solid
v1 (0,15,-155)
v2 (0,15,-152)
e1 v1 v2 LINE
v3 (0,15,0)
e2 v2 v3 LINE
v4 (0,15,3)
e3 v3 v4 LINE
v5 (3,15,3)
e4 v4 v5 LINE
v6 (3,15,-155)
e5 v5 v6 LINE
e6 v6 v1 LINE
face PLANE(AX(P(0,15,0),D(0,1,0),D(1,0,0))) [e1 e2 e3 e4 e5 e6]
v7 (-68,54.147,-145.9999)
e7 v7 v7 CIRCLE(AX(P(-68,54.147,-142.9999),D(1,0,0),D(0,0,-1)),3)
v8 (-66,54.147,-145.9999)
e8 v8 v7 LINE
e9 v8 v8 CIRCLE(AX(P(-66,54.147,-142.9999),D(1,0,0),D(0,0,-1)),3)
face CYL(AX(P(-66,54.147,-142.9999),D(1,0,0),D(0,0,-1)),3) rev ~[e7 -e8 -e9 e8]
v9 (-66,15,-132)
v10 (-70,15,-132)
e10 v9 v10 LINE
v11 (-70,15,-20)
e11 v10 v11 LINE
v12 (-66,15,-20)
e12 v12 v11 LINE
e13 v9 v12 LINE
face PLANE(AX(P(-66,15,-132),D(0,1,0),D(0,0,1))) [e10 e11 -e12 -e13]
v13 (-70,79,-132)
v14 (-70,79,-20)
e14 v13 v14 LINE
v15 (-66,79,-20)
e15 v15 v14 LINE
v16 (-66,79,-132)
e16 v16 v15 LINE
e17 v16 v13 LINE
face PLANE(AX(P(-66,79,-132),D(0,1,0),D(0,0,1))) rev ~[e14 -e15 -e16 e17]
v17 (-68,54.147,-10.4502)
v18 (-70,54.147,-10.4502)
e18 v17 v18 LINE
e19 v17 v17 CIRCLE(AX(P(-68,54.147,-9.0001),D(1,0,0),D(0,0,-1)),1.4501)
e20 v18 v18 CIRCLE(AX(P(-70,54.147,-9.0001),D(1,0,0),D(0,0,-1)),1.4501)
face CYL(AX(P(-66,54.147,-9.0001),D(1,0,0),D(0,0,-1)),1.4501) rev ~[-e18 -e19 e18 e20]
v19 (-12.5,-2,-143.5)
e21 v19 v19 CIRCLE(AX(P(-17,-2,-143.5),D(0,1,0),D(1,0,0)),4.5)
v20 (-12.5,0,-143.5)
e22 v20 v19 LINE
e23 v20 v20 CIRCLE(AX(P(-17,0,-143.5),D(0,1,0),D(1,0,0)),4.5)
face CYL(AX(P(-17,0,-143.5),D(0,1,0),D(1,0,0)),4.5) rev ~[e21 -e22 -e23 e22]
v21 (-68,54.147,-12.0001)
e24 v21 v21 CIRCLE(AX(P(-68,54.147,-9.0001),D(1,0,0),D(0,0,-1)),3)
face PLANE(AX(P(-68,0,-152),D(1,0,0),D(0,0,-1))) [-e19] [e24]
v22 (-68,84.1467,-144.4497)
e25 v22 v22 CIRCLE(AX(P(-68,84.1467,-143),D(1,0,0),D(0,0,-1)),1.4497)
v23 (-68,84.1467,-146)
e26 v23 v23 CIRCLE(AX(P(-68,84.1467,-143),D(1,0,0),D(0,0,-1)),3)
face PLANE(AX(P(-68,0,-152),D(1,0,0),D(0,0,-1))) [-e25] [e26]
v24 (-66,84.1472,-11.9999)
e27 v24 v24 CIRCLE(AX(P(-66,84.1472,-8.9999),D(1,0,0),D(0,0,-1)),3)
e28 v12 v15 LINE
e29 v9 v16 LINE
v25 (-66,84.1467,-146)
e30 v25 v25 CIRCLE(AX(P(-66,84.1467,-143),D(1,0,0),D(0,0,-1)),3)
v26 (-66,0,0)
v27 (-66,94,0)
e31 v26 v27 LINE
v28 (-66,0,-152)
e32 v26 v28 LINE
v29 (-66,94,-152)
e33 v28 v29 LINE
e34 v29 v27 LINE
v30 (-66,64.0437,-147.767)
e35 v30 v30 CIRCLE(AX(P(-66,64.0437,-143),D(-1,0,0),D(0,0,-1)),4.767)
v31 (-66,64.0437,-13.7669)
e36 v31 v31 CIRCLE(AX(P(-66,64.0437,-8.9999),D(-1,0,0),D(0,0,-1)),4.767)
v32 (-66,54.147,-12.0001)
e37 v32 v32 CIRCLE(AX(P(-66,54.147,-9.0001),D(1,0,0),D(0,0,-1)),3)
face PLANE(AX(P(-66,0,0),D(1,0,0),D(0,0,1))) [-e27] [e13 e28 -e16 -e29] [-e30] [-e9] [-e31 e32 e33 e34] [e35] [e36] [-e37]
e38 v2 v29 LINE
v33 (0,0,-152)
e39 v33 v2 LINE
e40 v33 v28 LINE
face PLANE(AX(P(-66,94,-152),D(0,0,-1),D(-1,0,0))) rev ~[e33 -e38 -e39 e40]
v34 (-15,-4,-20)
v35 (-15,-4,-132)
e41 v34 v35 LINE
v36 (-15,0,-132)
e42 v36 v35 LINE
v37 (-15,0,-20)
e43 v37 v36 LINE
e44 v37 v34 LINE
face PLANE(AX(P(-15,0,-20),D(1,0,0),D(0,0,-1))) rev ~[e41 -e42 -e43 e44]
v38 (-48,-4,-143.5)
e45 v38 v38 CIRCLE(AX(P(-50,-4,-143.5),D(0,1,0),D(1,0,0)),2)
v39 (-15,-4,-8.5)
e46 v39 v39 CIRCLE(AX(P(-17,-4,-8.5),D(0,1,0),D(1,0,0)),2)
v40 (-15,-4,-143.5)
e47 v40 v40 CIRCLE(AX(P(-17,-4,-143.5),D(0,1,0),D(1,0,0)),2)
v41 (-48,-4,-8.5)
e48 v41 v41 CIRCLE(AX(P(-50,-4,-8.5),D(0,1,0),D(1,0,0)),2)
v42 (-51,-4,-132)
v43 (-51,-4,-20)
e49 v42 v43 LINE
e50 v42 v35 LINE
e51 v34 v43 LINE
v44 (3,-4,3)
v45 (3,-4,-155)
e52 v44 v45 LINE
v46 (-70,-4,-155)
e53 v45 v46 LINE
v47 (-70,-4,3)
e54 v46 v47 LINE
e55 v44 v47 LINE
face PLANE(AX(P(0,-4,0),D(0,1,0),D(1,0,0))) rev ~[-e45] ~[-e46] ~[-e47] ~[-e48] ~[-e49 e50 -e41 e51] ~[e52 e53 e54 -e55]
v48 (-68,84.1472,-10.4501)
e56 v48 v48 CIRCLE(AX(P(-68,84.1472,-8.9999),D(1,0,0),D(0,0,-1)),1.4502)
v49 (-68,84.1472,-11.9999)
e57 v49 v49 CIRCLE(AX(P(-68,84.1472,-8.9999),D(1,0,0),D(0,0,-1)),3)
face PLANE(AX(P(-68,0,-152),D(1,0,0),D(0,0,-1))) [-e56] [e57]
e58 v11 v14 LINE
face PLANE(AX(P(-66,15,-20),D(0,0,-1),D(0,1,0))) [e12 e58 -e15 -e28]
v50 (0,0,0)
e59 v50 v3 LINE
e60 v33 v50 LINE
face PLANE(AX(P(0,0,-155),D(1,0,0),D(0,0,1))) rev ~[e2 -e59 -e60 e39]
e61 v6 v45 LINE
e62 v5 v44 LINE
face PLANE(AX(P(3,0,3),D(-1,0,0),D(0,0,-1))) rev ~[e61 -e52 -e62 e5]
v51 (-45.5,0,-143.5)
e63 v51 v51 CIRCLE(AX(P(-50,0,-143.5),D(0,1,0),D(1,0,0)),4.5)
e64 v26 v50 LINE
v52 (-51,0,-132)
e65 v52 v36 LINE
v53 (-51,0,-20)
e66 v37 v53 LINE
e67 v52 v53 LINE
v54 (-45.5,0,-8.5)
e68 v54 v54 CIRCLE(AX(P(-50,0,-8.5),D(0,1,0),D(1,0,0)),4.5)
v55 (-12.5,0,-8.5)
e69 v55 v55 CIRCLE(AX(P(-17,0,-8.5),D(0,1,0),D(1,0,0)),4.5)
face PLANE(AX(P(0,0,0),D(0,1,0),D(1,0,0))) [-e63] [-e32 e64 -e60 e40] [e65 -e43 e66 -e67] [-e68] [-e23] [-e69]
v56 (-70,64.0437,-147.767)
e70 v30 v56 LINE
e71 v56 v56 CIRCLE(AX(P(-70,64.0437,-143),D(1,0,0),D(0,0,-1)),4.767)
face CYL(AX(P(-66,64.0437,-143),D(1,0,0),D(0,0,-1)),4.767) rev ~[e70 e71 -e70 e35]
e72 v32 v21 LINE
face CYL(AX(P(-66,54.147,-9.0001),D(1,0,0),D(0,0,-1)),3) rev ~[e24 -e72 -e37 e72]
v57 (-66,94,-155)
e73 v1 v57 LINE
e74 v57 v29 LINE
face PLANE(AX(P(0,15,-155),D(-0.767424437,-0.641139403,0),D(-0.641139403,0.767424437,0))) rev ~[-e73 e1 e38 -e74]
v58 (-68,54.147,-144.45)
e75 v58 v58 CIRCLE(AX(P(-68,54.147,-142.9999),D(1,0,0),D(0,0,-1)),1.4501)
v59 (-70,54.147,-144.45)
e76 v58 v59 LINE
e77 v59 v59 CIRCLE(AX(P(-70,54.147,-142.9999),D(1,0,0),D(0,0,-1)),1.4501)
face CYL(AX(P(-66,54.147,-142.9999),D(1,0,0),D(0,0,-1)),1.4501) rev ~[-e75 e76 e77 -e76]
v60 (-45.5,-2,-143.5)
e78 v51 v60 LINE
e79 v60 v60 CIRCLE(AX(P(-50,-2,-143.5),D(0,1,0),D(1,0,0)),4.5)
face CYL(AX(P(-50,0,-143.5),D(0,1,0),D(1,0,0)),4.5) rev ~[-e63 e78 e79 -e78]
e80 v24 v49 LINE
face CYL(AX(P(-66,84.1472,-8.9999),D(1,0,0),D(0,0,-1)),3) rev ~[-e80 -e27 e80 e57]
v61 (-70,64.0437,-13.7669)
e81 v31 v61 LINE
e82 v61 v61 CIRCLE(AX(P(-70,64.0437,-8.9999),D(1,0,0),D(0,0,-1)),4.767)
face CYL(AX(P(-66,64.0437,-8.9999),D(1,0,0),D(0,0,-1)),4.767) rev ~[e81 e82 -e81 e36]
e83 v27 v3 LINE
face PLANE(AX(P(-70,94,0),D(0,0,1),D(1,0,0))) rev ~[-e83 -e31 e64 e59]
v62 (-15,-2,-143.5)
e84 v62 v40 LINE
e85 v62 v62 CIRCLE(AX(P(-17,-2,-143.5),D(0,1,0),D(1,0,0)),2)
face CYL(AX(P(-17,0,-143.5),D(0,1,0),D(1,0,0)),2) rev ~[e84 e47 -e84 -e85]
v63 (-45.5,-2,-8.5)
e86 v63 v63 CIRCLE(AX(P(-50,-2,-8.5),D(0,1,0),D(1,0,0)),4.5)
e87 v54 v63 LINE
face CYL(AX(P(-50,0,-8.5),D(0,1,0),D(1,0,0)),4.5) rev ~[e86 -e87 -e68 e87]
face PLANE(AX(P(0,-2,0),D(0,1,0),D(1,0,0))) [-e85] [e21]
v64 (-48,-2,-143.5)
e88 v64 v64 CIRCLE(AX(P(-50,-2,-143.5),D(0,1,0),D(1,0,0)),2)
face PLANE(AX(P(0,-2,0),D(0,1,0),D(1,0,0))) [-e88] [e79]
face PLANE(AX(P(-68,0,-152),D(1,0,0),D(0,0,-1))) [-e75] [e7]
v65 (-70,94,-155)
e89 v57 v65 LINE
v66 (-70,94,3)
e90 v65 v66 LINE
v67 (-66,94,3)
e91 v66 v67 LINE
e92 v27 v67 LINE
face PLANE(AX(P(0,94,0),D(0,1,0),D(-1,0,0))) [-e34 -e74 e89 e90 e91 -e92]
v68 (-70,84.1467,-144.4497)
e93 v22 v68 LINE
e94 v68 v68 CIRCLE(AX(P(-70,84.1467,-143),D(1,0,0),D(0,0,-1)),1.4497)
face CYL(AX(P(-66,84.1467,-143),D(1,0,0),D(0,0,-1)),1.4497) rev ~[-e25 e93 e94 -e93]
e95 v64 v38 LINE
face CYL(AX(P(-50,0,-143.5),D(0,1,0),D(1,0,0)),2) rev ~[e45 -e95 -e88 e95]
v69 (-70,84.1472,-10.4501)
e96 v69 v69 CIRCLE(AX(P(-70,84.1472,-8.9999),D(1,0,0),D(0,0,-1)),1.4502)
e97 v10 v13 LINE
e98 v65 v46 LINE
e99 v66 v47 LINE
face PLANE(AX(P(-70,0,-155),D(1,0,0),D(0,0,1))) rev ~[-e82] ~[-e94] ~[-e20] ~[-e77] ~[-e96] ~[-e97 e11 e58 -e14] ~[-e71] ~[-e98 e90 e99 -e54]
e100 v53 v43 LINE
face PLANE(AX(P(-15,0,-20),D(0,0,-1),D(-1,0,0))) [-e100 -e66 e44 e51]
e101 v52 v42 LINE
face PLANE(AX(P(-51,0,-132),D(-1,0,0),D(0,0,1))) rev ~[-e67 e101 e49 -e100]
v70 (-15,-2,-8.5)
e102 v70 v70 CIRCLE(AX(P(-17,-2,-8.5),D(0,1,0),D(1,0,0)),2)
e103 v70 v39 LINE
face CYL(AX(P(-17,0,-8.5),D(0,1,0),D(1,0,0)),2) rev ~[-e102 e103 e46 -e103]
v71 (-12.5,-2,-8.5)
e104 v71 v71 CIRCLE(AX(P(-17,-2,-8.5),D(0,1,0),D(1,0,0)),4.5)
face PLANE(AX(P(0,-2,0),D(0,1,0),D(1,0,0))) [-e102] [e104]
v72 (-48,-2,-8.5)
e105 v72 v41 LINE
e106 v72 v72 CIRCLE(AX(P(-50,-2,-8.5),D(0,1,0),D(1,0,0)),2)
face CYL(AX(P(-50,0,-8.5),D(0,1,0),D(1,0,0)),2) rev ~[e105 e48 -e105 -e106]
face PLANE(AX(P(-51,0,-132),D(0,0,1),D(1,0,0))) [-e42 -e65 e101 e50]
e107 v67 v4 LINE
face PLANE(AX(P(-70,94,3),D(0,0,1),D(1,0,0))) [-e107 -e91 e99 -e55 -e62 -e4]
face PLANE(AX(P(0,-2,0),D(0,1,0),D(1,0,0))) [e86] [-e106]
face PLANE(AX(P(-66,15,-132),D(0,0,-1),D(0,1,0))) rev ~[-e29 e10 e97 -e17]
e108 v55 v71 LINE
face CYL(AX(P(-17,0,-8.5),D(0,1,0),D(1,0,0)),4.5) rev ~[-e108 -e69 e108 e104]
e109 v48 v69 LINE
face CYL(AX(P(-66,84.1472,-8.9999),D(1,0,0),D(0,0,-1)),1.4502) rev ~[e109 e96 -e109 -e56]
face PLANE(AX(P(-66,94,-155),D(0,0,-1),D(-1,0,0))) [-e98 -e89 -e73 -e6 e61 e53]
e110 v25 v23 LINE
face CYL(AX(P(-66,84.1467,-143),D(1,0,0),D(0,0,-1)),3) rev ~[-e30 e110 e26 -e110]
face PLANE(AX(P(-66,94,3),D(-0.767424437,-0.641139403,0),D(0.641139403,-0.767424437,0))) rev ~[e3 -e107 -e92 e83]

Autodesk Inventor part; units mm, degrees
ref_plane "YZ Plane" through (0, 0, 0) normal (1, 0, 0) x (0, 1, 0)
ref_plane "XZ Plane" through (0, 0, 0) normal (0, 1, 0) x (-1, 0, 0)
ref_plane "XY Plane" through (0, 0, 0) normal (0, 0, 1) x (1, 0, 0)
sketch "Sketch1" plane through (0, 0, 0) normal (0, 1, 0) x (-1, 0, 0)
  line L0 (0, 0) -> (0, -152)
  line L1 (0, -152) -> (66, -152)
  line L2 (66, -152) -> (66, 0)
  line L3 (66, 0) -> (0, 0)
  line L4 (66, 0) -> (66, 3)
  line L5 (66, 3) -> (0, 3)
  line L6 (0, 3) -> (0, 0)
  line L7 (66, -152) -> (66, -155)
  line L8 (66, -155) -> (0, -155)
  line L9 (0, -155) -> (0, -152)
  line L10 (66, -155) -> (70, -155)
  line L11 (70, -155) -> (70, 3)
  line L12 (70, 3) -> (66, 3)
  dimension "d0" = 152
  dimension "d1" = 66
  dimension "d2" = 3
  dimension "d3" = 3
  dimension "d4" = 4
extrude "Extrusion1" add sketch "Sketch1" against normal blind 4
extrude "Extrusion2" add sketch "Sketch1" along normal blind 94 contours L4 L12 L11 L10 L7 L2
sketch "Sketch7" plane through (0, 0, 0) normal (0, 1, 0) x (1, 0, 0)
  line L0 (0, 155) -> (0, -3) projected
  line L1 (0, -3) -> (3, -3)
  line L2 (3, -3) -> (3, 155)
  line L3 (3, 155) -> (0, 155)
  line L4 (0, 155) -> (0, -3)
  point P0 (0, 0)
  dimension "d15" = 3
extrude "Extrusion3" add sketch "Sketch7" against normal up to surface (4 mm away)
extrude "Extrusion4" add sketch "Sketch7" along normal blind 15
sketch "Sketch8" plane through (-66, 94, -155) normal (0, 0, -1) x (-1, 0, 0)
  line L0 (-66, -79) -> (0, 0)
  line L1 (0, -94) -> (0, 0) projected
  line L2 (0, 0) -> (0, -94)
  line L3 (-66, -94) -> (0, -94) projected
  line L4 (0, -94) -> (-66, -94)
  line L5 (-66, -94) -> (-66, -79)
extrude "Extrusion5" add sketch "Sketch8" against normal blind 3
sketch "Sketch9" plane through (-70, 94, 3) normal (0, 0, 1) x (1, 0, 0)
  line L0 (0, 0) -> (4, 0) projected
  line L1 (70, -94) -> (70, -79) projected
  line L2 (4, 0) -> (70, -79)
  line L3 (70, -79) -> (70, -94)
  line L4 (4, -94) -> (70, -94) projected
  line L5 (70, -94) -> (4, -94)
  line L6 (4, -94) -> (4, 0) projected
  line L7 (4, -94) -> (4, 0)
extrude "Extrusion6" add sketch "Sketch9" against normal blind 3
sketch "Sketch10" plane through (0, 0, 0) normal (0, 1, 0) x (1, 0, 0)
  line L0 (-66, 0) -> (-66, 152) projected
  line L1 (-66, 0) -> (-66, 20)
  line L2 (-66, 20) -> (-51, 20)
  line L3 (-66, 0) -> (0, 0) projected
  line L4 (0, 0) -> (0, 20)
  line L5 (0, 152) -> (0, 0) projected
  line L6 (0, 20) -> (-15, 20)
  line L7 (0, 152) -> (0, 132)
  line L8 (0, 132) -> (-15, 132)
  line L9 (0, 152) -> (-66, 152) projected
  line L10 (-66, 152) -> (-66, 132)
  line L11 (-66, 132) -> (-51, 132)
  line L12 (-51, 132) -> (-51, 20)
  line L13 (-15, 20) -> (-51, 20)
  line L14 (-15, 20) -> (-15, 132)
  line L15 (-51, 132) -> (-15, 132)
  dimension "d24" = 20
  dimension "d25" = 15
  dimension "d26" = 20
  dimension "d27" = 15
  dimension "d28" = 20
  dimension "d29" = 20
  dimension "d30" = 15
extrude "Extrusion7" cut sketch "Sketch10" against normal up to surface (4 mm away) contours L12 L15 L14 L13
sketch "Sketch11" plane through (-66, 0, -152) normal (1, 0, 0) x (0, 0, -1)
  line L0 (-152, 94) -> (0, 94) projected
  line L1 (-152, 94) -> (-132, 94)
  line L2 (-132, 94) -> (-132, 79)
  line L3 (0, 94) -> (-20, 94)
  line L4 (-20, 94) -> (-20, 79)
  line L5 (-20, 79) -> (-132, 79)
  line L6 (0, 0) -> (-152, 0) projected
  line L7 (-152, 0) -> (-132, 0)
  line L8 (-132, 0) -> (-132, 15)
  line L9 (-132, 15) -> (-132, 79)
  line L10 (0, 0) -> (-20, 0)
  line L11 (-20, 0) -> (-20, 15)
  line L12 (-20, 15) -> (-20, 79)
  line L13 (-20, 15) -> (-132, 15)
  dimension "d33" = 20
  dimension "d34" = 15
  dimension "d35" = 20
  dimension "d36" = 15
  dimension "d37" = 20
  dimension "d38" = 15
  dimension "d39" = 20
  dimension "d40" = 15
extrude "Extrusion8" cut sketch "Sketch11" against normal up to surface (4 mm away) contours L5 L12 L13 L9
sketch "Sketch12" plane through (0, 0, 0) normal (0, 1, 0) x (1, 0, 0)
  line L0 (-70, -3) -> (3, -3) projected
  line L1 (3, -3) -> (3, 20)
  line L2 (3, -3) -> (3, 155) projected
  line L3 (3, -3) -> (3, 8.5)
  line L4 (3, 8.5) -> (-70, 8.5)
  line L5 (3, 8.5) -> (-17, 8.5)
  line L6 (-70, 8.5) -> (-50, 8.5)
  circle A0 centre (-17, 8.5) radius 2
  circle A1 centre (-50, 8.5) radius 2
  line L7 (-70, 155) -> (3, 155) projected
  line L8 (3, 155) -> (3, 143.5)
  line L9 (3, 143.5) -> (-70, 143.5)
  line L10 (-70, 155) -> (-70, -3) projected
  line L11 (3, 143.5) -> (-17, 143.5)
  line L12 (-70, 143.5) -> (-50, 143.5)
  circle A2 centre (-17, 143.5) radius 2
  circle A3 centre (-50, 143.5) radius 2
  dimension "d43" = 23
  dimension "d44" = 11.5
  dimension "d45" = 20
  dimension "d46" = 20
  dimension "d47" = 4
  dimension "d48" = 4
  dimension "d49" = 11.5
  dimension "d50" = 20
  dimension "d51" = 20
  dimension "d52" = 4
  dimension "d53" = 4
extrude "Extrusion9" cut sketch "Sketch12" against normal up to surface (4 mm away) contours A1 L4 | L4 A1 | A0 L4 | L4 A0 | A3 L9 | L9 A3 | A2 L9 | L9 A2
sketch "Sketch13" plane through (-66, 0, -152) normal (1, 0, 0) x (0, 0, -1)
  circle A0 centre (-143.0001, 84.1472) radius 1.4502 projected
  circle A1 centre (-142.9999, 54.147) radius 1.4501 projected
  circle A2 centre (-9, 84.1467) radius 1.4497 projected
  circle A3 centre (-9.0001, 54.147) radius 1.4501 projected
  point P0 (-152, 0)
extrude "Extrusion10" cut sketch "Sketch13" against normal up to surface (4 mm away)
sketch "Sketch14" plane through (-66, 0, -152) normal (1, 0, 0) x (0, 0, -1)
  circle A0 centre (-9, 84.1467) radius 1.4497 projected
  line L0 (-9, 84.1467) -> (-9, 64.0437)
  circle A1 centre (-9, 64.0437) radius 4.767
  circle A2 centre (-143.0001, 84.1472) radius 1.4502 projected
  line L1 (-143.0001, 84.1472) -> (-143.0001, 64.0437)
  circle A3 centre (-143.0001, 64.0437) radius 4.767
  point P0 (-152, 0)
  dimension "d58" = 20.103
  dimension "d59" = 9.534
extrude "Extrusion11" cut sketch "Sketch14" against normal up to surface (4 mm away) contours A1 | A3
sketch "Sketch15" plane through (0, 0, 0) normal (0, 1, 0) x (1, 0, 0)
  circle A0 centre (-50, 8.5) radius 2 projected
  circle A1 centre (-50, 8.5) radius 4.5
  circle A2 centre (-17, 8.5) radius 2 projected
  circle A3 centre (-17, 8.5) radius 4.5
  circle A4 centre (-50, 143.5) radius 2 projected
  circle A5 centre (-50, 143.5) radius 4.5
  circle A6 centre (-17, 143.5) radius 2 projected
  circle A7 centre (-17, 143.5) radius 4.5
  point P0 (0, 0)
  dimension "d68" = 9
  dimension "d69" = 9
  dimension "d70" = 9
  dimension "d71" = 9
extrude "Extrusion12" cut sketch "Sketch15" against normal blind 2
sketch "Sketch16" plane through (-66, 0, -152) normal (1, 0, 0) x (0, 0, -1)
  circle A0 centre (-143.0001, 84.1472) radius 1.4502 projected
  circle A1 centre (-143.0001, 84.1472) radius 3
  circle A2 centre (-142.9999, 54.147) radius 1.4501 projected
  circle A3 centre (-142.9999, 54.147) radius 3
  circle A4 centre (-9, 84.1467) radius 1.4497 projected
  circle A5 centre (-9, 84.1467) radius 3
  circle A6 centre (-9.0001, 54.147) radius 1.4501 projected
  circle A7 centre (-9.0001, 54.147) radius 3
  point P0 (-152, 0)
  dimension "d74" = 6
  dimension "d75" = 6
  dimension "d76" = 6
  dimension "d77" = 6
extrude "Extrusion13" cut sketch "Sketch16" against normal blind 2
properties part number "battery_box"
